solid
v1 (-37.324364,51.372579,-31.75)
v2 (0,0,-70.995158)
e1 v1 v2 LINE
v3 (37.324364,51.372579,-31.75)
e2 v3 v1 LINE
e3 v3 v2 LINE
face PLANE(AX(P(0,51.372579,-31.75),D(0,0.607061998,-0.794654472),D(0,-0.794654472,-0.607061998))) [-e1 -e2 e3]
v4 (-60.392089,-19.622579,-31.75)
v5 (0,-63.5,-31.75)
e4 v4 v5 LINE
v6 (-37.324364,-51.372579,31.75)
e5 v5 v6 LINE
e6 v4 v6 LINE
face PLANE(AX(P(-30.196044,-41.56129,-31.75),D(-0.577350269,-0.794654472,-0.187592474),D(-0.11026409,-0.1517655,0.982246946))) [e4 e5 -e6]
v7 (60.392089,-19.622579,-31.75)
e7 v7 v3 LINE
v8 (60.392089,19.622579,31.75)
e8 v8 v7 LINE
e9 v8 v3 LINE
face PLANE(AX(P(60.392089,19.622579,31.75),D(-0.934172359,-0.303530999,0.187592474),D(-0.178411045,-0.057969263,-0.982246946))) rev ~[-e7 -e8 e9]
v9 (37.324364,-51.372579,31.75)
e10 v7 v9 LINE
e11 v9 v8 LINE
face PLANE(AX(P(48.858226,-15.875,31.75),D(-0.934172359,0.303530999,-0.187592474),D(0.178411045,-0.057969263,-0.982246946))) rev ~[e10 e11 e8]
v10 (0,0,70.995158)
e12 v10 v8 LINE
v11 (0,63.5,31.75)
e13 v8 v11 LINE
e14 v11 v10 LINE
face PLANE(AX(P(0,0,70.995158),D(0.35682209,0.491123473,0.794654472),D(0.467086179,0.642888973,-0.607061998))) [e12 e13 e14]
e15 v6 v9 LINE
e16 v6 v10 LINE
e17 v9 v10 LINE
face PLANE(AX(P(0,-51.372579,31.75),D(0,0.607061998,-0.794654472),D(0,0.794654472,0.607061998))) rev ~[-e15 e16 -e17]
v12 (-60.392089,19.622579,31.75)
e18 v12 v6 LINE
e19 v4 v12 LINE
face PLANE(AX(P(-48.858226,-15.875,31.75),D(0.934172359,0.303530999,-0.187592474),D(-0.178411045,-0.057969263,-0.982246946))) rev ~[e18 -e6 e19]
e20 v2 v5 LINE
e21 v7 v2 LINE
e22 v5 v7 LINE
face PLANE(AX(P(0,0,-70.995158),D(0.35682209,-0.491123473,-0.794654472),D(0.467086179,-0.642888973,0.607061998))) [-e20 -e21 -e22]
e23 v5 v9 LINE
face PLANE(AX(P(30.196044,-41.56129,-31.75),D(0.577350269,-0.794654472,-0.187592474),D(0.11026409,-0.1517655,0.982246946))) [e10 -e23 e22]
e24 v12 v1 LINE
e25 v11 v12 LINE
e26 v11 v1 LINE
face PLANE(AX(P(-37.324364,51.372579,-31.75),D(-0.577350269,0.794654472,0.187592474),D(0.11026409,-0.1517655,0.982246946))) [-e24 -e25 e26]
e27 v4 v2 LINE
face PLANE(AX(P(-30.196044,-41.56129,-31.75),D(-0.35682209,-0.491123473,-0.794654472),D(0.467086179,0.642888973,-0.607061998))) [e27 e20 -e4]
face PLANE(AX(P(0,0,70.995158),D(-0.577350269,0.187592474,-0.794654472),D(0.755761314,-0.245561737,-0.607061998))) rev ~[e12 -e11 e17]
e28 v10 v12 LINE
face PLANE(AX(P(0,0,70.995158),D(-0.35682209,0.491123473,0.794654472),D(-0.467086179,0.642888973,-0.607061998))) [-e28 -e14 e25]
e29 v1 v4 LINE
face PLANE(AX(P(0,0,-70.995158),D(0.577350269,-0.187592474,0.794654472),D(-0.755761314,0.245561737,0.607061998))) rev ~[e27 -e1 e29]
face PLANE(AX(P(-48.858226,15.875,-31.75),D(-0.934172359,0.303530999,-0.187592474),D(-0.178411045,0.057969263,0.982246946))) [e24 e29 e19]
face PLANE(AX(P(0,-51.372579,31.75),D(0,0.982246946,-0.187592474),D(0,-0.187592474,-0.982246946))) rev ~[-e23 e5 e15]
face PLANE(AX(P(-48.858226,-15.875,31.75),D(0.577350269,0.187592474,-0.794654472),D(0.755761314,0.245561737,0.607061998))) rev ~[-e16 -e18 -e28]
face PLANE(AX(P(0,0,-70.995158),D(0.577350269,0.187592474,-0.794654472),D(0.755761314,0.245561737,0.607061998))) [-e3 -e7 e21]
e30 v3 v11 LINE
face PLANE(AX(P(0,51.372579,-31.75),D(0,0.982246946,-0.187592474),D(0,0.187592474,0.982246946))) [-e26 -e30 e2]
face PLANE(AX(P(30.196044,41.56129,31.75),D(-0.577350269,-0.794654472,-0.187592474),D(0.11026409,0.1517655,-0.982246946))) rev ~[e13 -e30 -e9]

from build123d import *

# Parameters (mm, degrees)
F12_DEPTH      = 37.3243635206
F12_DEPTH_BACK = 37.3243635206
F15_DEPTH      = 37.3243635206
F15_DEPTH_BACK = 37.3243635206
F18_DEPTH      = 37.3243635206
F18_DEPTH_BACK = 37.3243635206
F21_DEPTH      = 37.3243635206
F21_DEPTH_BACK = 37.3243635206
F24_DEPTH      = 37.3243635206
F24_DEPTH_BACK = 37.3243635206
F28_DEPTH      = 99.1671965959
F28_DEPTH_BACK = 99.1671965959
F32_DEPTH      = 89.4601183415
F32_DEPTH_BACK = 89.4601183415
F35_DEPTH      = 89.4601183415
F35_DEPTH_BACK = 88.5596960493
F39_DEPTH      = 99.1671965959
F39_DEPTH_BACK = 96.8098604305
F42_DEPTH      = 68.0823305395
F42_DEPTH_BACK = 70.9961582856
F45_DEPTH      = 92.4043169267
F45_DEPTH_BACK = 99.1671965959
F48_DEPTH      = 81.4313769211
F48_DEPTH_BACK = 89.4601183415
F52_DEPTH      = 88.5596960493
F52_DEPTH_BACK = 82.3317992133
F56_DEPTH      = 92.4043169267
F56_DEPTH_BACK = 96.8098604305
F59_DEPTH      = 68.0823305395
F59_DEPTH_BACK = 68.0823305395
F62_DEPTH      = 37.3243635206
F62_DEPTH_BACK = 37.3243635206
F65_DEPTH      = 68.0823305395
F65_DEPTH_BACK = 68.0823305395
F68_DEPTH      = 81.4313769211
F68_DEPTH_BACK = 81.4313769211
F71_DEPTH      = 92.4043169267
F71_DEPTH_BACK = 92.4043169267
F74_DEPTH      = 92.4043169267
F74_DEPTH_BACK = 92.4043169267


# Not quite as in the source:
# - a feature names something its author has since deleted; it is built from what else it names


with BuildPart() as f9:
    # F7 (on Front) → F9 (revolve)
    with BuildSketch(Plane.XZ):
        with BuildLine():
            Line((0, 0), (0, 31.75))
            Line((0, 31.75), (0, 70.9951582856))
            ThreePointArc((0, 70.9951582856), (-70.9951582856, 0), (0, -70.9951582856))
            Line((0, -70.9951582856), (0, -31.75))
            Line((0, -31.75), (0, 0))
        make_face()
    revolve(axis=Axis((0, 0, -35.4975791428), (0, 0, -1)))

    # F11 (on 3pt) → F12 (cut, two sides)
    with BuildSketch(Plane(origin=(0, 0, 0), x_dir=(-0.5877852523, 0.8090169944, 0), z_dir=(0.8090169944, 0.5877852523, 0))) as f12_sk:
        Polygon((-63.5, -70.9951582856), (0, -70.9951582856), (-51.3725791428, -31.75), (-63.5, -31.75), align=None)
    extrude(amount=F12_DEPTH, mode=Mode.SUBTRACT)
    extrude(f12_sk.sketch, amount=-F12_DEPTH_BACK, mode=Mode.SUBTRACT)

    # F14 (on 3pt) → F15 (cut, two sides)
    with BuildSketch(Plane(origin=(0, 0, 0), x_dir=(-0.5877852523, -0.8090169944, 0), z_dir=(-0.8090169944, 0.5877852523, 0))) as f15_sk:
        Polygon((51.3725791428, -31.75), (0, -70.9951582856), (63.5, -70.9951582856), (63.5, -31.75), align=None)
    extrude(amount=-F15_DEPTH, mode=Mode.SUBTRACT)
    extrude(f15_sk.sketch, amount=F15_DEPTH_BACK, mode=Mode.SUBTRACT)

    # F17 (on 3pt) → F18 (cut, two sides)
    with BuildSketch(Plane(origin=(0, 0, 0), x_dir=(0.9510565163, -0.3090169944, 0), z_dir=(-0.3090169944, -0.9510565163, 0))) as f18_sk:
        Polygon((-63.5, -70.9951582856), (0, -70.9951582856), (-51.3725791428, -31.75), (-63.5, -31.75), align=None)
    extrude(amount=-F18_DEPTH, mode=Mode.SUBTRACT)
    extrude(f18_sk.sketch, amount=F18_DEPTH_BACK, mode=Mode.SUBTRACT)

    # F20 (on 3pt) → F21 (cut, two sides)
    with BuildSketch(Plane.YZ) as f21_sk:
        Polygon((51.3725791428, -31.75), (0, -70.9951582856), (63.5, -70.9951582856), (63.5, -31.75), align=None)
    extrude(amount=-F21_DEPTH, mode=Mode.SUBTRACT)
    extrude(f21_sk.sketch, amount=F21_DEPTH_BACK, mode=Mode.SUBTRACT)

    # F23 (on 3pt) → F24 (cut, two sides)
    with BuildSketch(Plane(origin=(0, 0, 0), x_dir=(-0.9510565163, -0.3090169944, 0), z_dir=(-0.3090169944, 0.9510565163, 0))) as f24_sk:
        Polygon((-63.5, -70.9951582856), (0, -70.9951582856), (-51.3725791428, -31.75), (-63.5, -31.75), align=None)
    extrude(amount=F24_DEPTH, mode=Mode.SUBTRACT)
    extrude(f24_sk.sketch, amount=-F24_DEPTH_BACK, mode=Mode.SUBTRACT)

    # F27 (on 3pt) → F28 (cut, two sides)
    with BuildSketch(Plane(origin=(0, 0, 0), x_dir=(-0.5877852523, 0.8090169944, 0), z_dir=(0.8090169944, 0.5877852523, 0))) as f28_sk:
        Polygon((-70.9951582856, -31.75), (-51.3725791428, -31.75), (-63.5, 31.75), (-70.9951582856, 31.75), align=None)
    extrude(amount=F28_DEPTH, mode=Mode.SUBTRACT)
    extrude(f28_sk.sketch, amount=-F28_DEPTH_BACK, mode=Mode.SUBTRACT)

    # F31 (on 3pt) → F32 (cut, two sides)
    with BuildSketch(Plane(origin=(0, 0, 0), x_dir=(0.9510565163, -0.3090169944, 0), z_dir=(-0.3090169944, -0.9510565163, 0))) as f32_sk:
        Polygon((70.9951582856, 31.75), (51.3725791428, 31.75), (63.5, -31.75), (70.9951582856, -31.75), align=None)
    extrude(amount=-F32_DEPTH, mode=Mode.SUBTRACT)
    extrude(f32_sk.sketch, amount=F32_DEPTH_BACK, mode=Mode.SUBTRACT)

    # F34 (on 3pt) → F35 (cut, two sides)
    with BuildSketch(Plane(origin=(0, 0, 0), x_dir=(0.9510565163, 0.3090169944, 0), z_dir=(0.3090169944, -0.9510565163, 0))) as f35_sk:
        Polygon((63.5, 31.75), (51.3725791428, -31.75), (70.9951582856, -31.75), (70.9951582856, 31.75), align=None)
    extrude(amount=-F35_DEPTH, mode=Mode.SUBTRACT)
    extrude(f35_sk.sketch, amount=F35_DEPTH_BACK, mode=Mode.SUBTRACT)

    # F38 (on 3pt) → F39 (cut, two sides)
    with BuildSketch(Plane(origin=(0, 0, 0), x_dir=(0.5877852523, 0.8090169944, 0), z_dir=(0.8090169944, -0.5877852523, 0))) as f39_sk:
        Polygon((70.9951582856, 31.75), (51.3725791428, 31.75), (63.5, -31.75), (70.9951582856, -31.75), align=None)
    extrude(amount=-F39_DEPTH, mode=Mode.SUBTRACT)
    extrude(f39_sk.sketch, amount=F39_DEPTH_BACK, mode=Mode.SUBTRACT)

    # F41 (on 3pt) → F42 (cut, two sides)
    with BuildSketch(Plane(origin=(0, 0, 0), x_dir=(0, -1, 0), z_dir=(-1, 0, 0))) as f42_sk:
        Polygon((-70.9951582856, -31.75), (-51.3725791428, -31.75), (-63.5, 31.75), (-70.9951582856, 31.75), align=None)
    extrude(amount=-F42_DEPTH, mode=Mode.SUBTRACT)
    extrude(f42_sk.sketch, amount=F42_DEPTH_BACK, mode=Mode.SUBTRACT)

    # F44 (on 3pt) → F45 (cut, two sides)
    with BuildSketch(Plane(origin=(0, 0, 0), x_dir=(0.5877852523, -0.8090169944, 0), z_dir=(-0.8090169944, -0.5877852523, 0))) as f45_sk:
        Polygon((-63.5, -31.75), (-51.3725791428, 31.75), (-70.9951582856, 31.75), (-70.9951582856, -31.75), align=None)
    extrude(amount=-F45_DEPTH, mode=Mode.SUBTRACT)
    extrude(f45_sk.sketch, amount=F45_DEPTH_BACK, mode=Mode.SUBTRACT)

    # F47 (on 3pt) → F48 (cut, two sides)
    with BuildSketch(Plane(origin=(0, 0, 0), x_dir=(0.9510565163, -0.3090169944, 0), z_dir=(-0.3090169944, -0.9510565163, 0))) as f48_sk:
        Polygon((-70.9951582856, -31.75), (-51.3725791428, -31.75), (-63.5, 31.75), (-70.9951582856, 31.75), align=None)
    extrude(amount=-F48_DEPTH, mode=Mode.SUBTRACT)
    extrude(f48_sk.sketch, amount=F48_DEPTH_BACK, mode=Mode.SUBTRACT)

    # F51 (on 3pt) → F52 (cut, two sides)
    with BuildSketch(Plane(origin=(0, 0, 0), x_dir=(-0.9510565163, -0.3090169944, 0), z_dir=(-0.3090169944, 0.9510565163, 0))) as f52_sk:
        Polygon((70.9951582856, 31.75), (51.3725791428, 31.75), (63.5, -31.75), (70.9951582856, -31.75), align=None)
    extrude(amount=-F52_DEPTH, mode=Mode.SUBTRACT)
    extrude(f52_sk.sketch, amount=F52_DEPTH_BACK, mode=Mode.SUBTRACT)

    # F55 (on 3pt) → F56 (cut, two sides)
    with BuildSketch(Plane(origin=(0, 0, 0), x_dir=(0.5877852523, 0.8090169944, 0), z_dir=(0.8090169944, -0.5877852523, 0))) as f56_sk:
        Polygon((-70.9951582856, -31.75), (-51.3725791428, -31.75), (-63.5, 31.75), (-70.9951582856, 31.75), align=None)
    extrude(amount=-F56_DEPTH, mode=Mode.SUBTRACT)
    extrude(f56_sk.sketch, amount=F56_DEPTH_BACK, mode=Mode.SUBTRACT)

    # F58 (on 3pt) → F59 (cut, two sides)
    with BuildSketch(Plane(origin=(0, 0, 0), x_dir=(0, -1, 0), z_dir=(-1, 0, 0))) as f59_sk:
        Polygon((70.9951582856, 31.75), (51.3725791428, 31.75), (63.5, -31.75), (70.9951582856, -31.75), align=None)
    extrude(amount=-F59_DEPTH, mode=Mode.SUBTRACT)
    extrude(f59_sk.sketch, amount=F59_DEPTH_BACK, mode=Mode.SUBTRACT)

    # F61 (on 3pt) → F62 (cut, two sides)
    with BuildSketch(Plane(origin=(0, 0, 0), x_dir=(0.9510565163, -0.3090169944, 0), z_dir=(-0.3090169944, -0.9510565163, 0))) as f62_sk:
        Polygon((63.5, 70.9951582856), (0, 70.9951582856), (51.3725791428, 31.75), (63.5, 31.75), align=None)
    extrude(amount=F62_DEPTH, mode=Mode.SUBTRACT)
    extrude(f62_sk.sketch, amount=-F62_DEPTH_BACK, mode=Mode.SUBTRACT)

    # F64 (on 3pt) → F65 (cut, two sides)
    with BuildSketch(Plane.YZ) as f65_sk:
        Polygon((-51.3725791428, 31.75), (0, 70.9951582856), (-63.5, 70.9951582856), (-63.5, 31.75), align=None)
    extrude(amount=-F65_DEPTH, mode=Mode.SUBTRACT)
    extrude(f65_sk.sketch, amount=F65_DEPTH_BACK, mode=Mode.SUBTRACT)

    # F67 (on 3pt) → F68 (cut, two sides)
    with BuildSketch(Plane(origin=(0, 0, 0), x_dir=(0.9510565163, 0.3090169944, 0), z_dir=(0.3090169944, -0.9510565163, 0))) as f68_sk:
        Polygon((-51.3725791428, 31.75), (0, 70.9951582856), (-63.5, 70.9951582856), (-63.5, 31.75), align=None)
    extrude(amount=-F68_DEPTH, mode=Mode.SUBTRACT)
    extrude(f68_sk.sketch, amount=F68_DEPTH_BACK, mode=Mode.SUBTRACT)

    # F70 (on 3pt) → F71 (cut, two sides)
    with BuildSketch(Plane(origin=(0, 0, 0), x_dir=(-0.5877852523, 0.8090169944, 0), z_dir=(0.8090169944, 0.5877852523, 0))) as f71_sk:
        Polygon((63.5, 70.9951582856), (0, 70.9951582856), (51.3725791428, 31.75), (63.5, 31.75), align=None)
    extrude(amount=-F71_DEPTH, mode=Mode.SUBTRACT)
    extrude(f71_sk.sketch, amount=F71_DEPTH_BACK, mode=Mode.SUBTRACT)

    # F73 (on 3pt) → F74 (cut, two sides)
    with BuildSketch(Plane(origin=(0, 0, 0), x_dir=(0.5877852523, 0.8090169944, 0), z_dir=(0.8090169944, -0.5877852523, 0))) as f74_sk:
        Polygon((63.5, 70.9951582856), (0, 70.9951582856), (51.3725791428, 31.75), (63.5, 31.75), align=None)
    extrude(amount=-F74_DEPTH, mode=Mode.SUBTRACT)
    extrude(f74_sk.sketch, amount=F74_DEPTH_BACK, mode=Mode.SUBTRACT)


solid = f9.part
